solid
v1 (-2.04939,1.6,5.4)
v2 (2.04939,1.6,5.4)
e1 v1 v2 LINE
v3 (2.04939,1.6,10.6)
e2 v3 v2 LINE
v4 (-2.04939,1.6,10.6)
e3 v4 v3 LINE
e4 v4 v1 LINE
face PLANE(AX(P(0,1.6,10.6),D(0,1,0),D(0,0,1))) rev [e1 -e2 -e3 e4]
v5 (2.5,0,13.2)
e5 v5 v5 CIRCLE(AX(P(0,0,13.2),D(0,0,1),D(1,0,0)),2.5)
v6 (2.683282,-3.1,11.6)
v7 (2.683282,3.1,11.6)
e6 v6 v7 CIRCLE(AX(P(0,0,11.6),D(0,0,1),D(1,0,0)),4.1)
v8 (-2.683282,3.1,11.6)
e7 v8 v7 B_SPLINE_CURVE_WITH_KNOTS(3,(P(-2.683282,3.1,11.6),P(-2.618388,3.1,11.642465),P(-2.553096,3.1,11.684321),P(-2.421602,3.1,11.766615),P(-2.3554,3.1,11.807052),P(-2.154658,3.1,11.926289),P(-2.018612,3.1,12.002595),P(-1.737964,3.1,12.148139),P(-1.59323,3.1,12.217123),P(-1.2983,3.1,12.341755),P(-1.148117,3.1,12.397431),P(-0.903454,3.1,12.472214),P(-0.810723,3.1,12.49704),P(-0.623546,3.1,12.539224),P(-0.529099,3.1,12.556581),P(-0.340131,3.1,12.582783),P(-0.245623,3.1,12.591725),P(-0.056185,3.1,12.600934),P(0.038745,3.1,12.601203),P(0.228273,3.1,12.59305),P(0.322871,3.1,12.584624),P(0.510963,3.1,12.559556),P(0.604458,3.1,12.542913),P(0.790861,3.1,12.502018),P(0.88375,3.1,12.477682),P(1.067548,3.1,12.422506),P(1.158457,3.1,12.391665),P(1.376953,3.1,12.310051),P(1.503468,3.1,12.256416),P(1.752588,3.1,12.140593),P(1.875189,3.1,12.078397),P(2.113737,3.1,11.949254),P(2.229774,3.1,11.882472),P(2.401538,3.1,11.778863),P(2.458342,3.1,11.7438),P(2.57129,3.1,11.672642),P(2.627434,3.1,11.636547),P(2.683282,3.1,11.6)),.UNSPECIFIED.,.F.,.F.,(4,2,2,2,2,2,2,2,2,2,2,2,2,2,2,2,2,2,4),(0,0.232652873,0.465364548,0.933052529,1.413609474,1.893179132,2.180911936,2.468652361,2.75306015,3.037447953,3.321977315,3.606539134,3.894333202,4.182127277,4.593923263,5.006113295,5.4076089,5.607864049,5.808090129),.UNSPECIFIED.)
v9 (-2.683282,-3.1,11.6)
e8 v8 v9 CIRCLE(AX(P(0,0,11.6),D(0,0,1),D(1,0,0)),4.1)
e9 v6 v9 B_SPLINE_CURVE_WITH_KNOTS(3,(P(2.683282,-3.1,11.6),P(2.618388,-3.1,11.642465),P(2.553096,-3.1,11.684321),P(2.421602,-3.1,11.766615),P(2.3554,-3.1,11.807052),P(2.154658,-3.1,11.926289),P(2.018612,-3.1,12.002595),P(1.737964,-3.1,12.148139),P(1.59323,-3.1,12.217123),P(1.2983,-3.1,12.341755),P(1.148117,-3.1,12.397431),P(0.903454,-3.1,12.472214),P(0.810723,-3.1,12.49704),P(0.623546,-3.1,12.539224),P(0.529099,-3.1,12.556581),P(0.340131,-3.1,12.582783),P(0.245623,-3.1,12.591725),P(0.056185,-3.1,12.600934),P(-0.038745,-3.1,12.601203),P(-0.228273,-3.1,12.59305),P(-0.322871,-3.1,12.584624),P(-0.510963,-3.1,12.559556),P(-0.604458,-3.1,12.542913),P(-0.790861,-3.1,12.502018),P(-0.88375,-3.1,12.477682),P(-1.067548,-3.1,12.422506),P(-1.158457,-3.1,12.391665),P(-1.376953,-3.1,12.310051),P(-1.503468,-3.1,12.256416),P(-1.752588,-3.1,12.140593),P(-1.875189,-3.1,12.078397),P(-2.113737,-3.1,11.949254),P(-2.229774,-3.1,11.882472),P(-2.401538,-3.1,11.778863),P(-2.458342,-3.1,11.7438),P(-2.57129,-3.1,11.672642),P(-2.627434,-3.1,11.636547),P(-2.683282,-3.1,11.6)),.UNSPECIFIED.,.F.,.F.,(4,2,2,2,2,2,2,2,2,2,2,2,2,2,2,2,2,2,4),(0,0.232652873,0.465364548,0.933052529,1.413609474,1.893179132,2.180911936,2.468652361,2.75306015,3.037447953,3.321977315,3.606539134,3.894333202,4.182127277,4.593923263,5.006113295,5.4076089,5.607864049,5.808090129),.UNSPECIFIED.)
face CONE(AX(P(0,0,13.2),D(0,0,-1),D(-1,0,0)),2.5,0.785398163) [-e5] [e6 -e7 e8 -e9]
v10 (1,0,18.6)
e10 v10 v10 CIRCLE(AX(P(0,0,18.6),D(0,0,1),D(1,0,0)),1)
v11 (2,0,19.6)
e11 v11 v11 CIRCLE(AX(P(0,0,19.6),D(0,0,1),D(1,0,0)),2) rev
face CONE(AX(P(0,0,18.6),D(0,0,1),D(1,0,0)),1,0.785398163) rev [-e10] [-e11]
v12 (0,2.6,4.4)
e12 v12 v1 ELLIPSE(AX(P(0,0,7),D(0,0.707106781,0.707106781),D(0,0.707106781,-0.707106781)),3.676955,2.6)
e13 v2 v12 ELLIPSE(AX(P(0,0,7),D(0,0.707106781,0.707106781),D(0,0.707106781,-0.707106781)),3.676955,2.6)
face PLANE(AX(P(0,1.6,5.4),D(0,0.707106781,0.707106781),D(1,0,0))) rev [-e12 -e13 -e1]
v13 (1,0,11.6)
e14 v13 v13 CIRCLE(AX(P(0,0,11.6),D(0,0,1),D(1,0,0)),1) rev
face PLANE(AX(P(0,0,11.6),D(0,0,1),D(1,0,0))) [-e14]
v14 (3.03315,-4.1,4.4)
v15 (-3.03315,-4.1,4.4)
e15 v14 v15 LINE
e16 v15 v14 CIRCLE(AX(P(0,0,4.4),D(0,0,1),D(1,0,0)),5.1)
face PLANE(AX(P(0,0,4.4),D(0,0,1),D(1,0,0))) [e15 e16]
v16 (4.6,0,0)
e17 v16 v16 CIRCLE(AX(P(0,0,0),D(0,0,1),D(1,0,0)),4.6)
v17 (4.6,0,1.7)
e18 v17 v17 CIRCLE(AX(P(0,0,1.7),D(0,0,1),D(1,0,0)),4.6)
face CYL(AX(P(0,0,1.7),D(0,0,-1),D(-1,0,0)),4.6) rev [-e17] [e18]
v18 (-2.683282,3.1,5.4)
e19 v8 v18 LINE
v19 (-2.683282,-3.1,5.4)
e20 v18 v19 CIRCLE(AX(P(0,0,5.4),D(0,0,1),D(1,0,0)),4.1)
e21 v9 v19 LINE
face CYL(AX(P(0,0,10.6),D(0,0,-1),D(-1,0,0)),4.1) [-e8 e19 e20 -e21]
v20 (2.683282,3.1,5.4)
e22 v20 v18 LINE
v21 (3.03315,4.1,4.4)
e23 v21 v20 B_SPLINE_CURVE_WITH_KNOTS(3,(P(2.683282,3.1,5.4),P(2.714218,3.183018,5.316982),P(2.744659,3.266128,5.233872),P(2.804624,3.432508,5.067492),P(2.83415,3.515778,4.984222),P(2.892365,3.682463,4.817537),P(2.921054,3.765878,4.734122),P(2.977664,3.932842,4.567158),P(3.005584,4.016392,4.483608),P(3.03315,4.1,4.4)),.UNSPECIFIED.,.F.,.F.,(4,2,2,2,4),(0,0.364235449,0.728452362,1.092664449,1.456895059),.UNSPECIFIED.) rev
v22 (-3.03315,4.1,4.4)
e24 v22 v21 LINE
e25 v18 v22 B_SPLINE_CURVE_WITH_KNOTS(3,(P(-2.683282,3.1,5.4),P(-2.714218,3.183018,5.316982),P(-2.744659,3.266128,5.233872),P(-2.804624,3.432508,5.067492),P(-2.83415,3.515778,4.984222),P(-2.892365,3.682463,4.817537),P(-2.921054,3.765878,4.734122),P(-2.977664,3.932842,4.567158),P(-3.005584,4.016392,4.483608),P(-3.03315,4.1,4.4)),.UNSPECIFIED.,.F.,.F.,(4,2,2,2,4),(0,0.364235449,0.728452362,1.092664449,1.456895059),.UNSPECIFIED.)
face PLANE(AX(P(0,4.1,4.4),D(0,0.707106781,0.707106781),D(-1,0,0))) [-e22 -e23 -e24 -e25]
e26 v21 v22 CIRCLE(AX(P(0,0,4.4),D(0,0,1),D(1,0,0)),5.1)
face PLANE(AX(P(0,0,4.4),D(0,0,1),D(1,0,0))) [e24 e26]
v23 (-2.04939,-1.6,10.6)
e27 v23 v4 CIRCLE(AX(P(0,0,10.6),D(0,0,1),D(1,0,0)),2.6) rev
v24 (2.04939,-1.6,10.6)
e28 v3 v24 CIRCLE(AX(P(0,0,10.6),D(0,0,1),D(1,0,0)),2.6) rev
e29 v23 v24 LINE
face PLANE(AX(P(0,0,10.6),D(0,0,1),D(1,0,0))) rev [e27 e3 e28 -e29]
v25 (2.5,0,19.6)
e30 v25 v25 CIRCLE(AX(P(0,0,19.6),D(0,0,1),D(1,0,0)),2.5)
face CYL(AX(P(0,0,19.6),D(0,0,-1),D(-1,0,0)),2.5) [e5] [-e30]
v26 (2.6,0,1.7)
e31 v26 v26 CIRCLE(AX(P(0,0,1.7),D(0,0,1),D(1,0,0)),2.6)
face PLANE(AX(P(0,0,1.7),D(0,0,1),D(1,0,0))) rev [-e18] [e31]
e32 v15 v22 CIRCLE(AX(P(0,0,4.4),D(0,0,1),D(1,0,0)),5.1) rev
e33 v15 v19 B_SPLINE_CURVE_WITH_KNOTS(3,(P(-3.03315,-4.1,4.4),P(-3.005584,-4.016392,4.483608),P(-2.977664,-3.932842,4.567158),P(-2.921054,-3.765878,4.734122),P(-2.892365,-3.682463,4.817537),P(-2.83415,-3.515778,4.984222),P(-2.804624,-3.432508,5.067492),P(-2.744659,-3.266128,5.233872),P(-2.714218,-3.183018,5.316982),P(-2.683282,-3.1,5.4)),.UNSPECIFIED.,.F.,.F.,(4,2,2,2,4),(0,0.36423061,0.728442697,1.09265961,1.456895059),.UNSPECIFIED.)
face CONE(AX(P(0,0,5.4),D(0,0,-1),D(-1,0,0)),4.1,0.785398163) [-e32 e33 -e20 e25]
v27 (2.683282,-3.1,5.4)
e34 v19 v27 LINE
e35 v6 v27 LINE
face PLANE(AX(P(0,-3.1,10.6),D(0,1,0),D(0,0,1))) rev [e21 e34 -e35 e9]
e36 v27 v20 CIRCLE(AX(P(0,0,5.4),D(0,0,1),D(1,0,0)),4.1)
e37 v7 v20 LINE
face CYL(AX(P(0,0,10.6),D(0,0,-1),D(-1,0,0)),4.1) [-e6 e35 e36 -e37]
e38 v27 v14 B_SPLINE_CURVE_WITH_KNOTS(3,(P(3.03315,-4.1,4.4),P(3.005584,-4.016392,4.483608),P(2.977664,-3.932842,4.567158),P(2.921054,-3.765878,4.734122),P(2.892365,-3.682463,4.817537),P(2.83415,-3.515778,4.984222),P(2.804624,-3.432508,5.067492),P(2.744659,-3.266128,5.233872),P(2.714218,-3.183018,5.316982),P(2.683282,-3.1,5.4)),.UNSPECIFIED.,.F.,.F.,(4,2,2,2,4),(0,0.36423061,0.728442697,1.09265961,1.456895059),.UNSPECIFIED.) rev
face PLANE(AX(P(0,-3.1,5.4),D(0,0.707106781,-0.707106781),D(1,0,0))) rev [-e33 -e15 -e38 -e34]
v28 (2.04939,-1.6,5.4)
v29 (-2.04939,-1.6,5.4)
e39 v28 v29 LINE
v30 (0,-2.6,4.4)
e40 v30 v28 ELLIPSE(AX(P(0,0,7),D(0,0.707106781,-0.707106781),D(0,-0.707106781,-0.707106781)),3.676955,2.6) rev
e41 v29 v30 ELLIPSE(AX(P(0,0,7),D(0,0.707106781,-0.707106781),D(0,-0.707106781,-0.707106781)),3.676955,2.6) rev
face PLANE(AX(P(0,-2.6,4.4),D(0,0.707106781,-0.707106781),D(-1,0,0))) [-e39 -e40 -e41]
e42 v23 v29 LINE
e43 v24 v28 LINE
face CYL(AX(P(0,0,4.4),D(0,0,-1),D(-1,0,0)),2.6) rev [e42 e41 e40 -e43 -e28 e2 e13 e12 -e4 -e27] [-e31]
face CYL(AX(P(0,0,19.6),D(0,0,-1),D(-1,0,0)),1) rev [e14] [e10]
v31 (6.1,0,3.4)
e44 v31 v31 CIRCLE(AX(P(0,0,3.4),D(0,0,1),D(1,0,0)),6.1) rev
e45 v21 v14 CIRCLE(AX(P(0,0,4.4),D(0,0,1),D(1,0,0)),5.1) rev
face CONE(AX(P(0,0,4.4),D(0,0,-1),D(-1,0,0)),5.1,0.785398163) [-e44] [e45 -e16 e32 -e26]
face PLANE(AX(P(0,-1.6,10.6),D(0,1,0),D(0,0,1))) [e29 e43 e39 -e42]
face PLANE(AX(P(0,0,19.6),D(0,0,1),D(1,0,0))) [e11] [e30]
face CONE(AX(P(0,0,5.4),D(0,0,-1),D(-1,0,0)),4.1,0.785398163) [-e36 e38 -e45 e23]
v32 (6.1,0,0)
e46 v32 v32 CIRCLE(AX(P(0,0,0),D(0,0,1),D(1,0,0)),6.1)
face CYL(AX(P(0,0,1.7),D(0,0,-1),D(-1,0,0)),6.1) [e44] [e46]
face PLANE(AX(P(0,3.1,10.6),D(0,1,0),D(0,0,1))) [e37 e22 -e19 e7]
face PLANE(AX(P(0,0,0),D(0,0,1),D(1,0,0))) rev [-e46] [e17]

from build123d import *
from build123d.topology import SkipClean

# Parameters (mm, degrees)
ESQUISSE1_R        = 6.1
ESQUISSE1_R_2      = 4.6
BOSS_EXTRU_1_DEPTH = 1.7
ESQUISSE2_R        = 6.1
ESQUISSE2_R_2      = 2.6
BOSS_EXTRU_2_DEPTH = 2.7
BOSS_EXTRU_3_DEPTH = 6.2
BOSS_EXTRU_4_DEPTH = 1
CHANFREIN1_SIZE    = 1
CHANFREIN2_SIZE    = 1
ESQUISSE5_R        = 2.5
ESQUISSE5_R_2      = 1
BOSS_EXTRU_5_DEPTH = 8
CHANFREIN3_SIZE    = 1
CHANFREIN4_SIZE    = 1.6


# Some blends are built 0.0001 mm under size
with BuildPart() as part:
    # Esquisse1 → Boss.-Extru.1 (new body)
    with BuildSketch(Plane.XY):
        Circle(ESQUISSE1_R)
        Circle(ESQUISSE1_R_2, mode=Mode.SUBTRACT)
    extrude(amount=BOSS_EXTRU_1_DEPTH)

    # Esquisse2 → Boss.-Extru.2 (add)
    with BuildSketch(Plane.XY.offset(1.7)):
        Circle(ESQUISSE2_R)
        with Locations(Location((0, 0, 0), (0, 0, 180))):
            Circle(ESQUISSE2_R_2, mode=Mode.SUBTRACT)
    extrude(amount=BOSS_EXTRU_2_DEPTH)

    # Esquisse3 → Boss.-Extru.3 (add)
    with SkipClean():  # the faces are left unmerged after this step: merging them gives an invalid solid
        with BuildSketch(Plane.XY.offset(4.4)):
            with BuildLine():
                Line((2.683282, 3.1), (-2.683282, 3.1))
                ThreePointArc((-2.683282, 3.1), (-4.1, 0), (-2.683282, -3.1))
                Line((-2.683282, -3.1), (2.683282, -3.1))
                ThreePointArc((2.683282, -3.1), (4.1, 0), (2.683282, 3.1))
            make_face()
            with BuildLine():
                Line((2.04939, -1.6), (-2.04939, -1.6))
                ThreePointArc((-2.04939, -1.6), (-2.6, 0), (-2.04939, 1.6))
                Line((-2.04939, 1.6), (2.04939, 1.6))
                ThreePointArc((2.04939, 1.6), (2.6, 0), (2.04939, -1.6))
            make_face(mode=Mode.SUBTRACT)
        extrude(amount=BOSS_EXTRU_3_DEPTH)

    # Esquisse4 → Boss.-Extru.4 (add)
    with SkipClean():  # the faces are left unmerged after this step: merging them gives an invalid solid
        with BuildSketch(Plane.XY.offset(10.6)):
            with BuildLine():
                Line((2.683282, 3.1), (-2.683282, 3.1))
                ThreePointArc((-2.683282, 3.1), (-4.1, 0), (-2.683282, -3.1))
                Line((-2.683282, -3.1), (2.683282, -3.1))
                ThreePointArc((2.683282, -3.1), (4.1, 0), (2.683282, 3.1))
            make_face()
        extrude(amount=BOSS_EXTRU_4_DEPTH)

    # Chanfrein1
    chanfrein1_edges = [part.edges().sort_by_distance(p)[0] for p in [
        (0, 3.1, 4.4),
        (-4.1, 0, 4.4),
        (0, -3.1, 4.4),
        (4.1, 0, 4.4),
        (-6.1, 0, 4.4),
    ]]
    chamfer(chanfrein1_edges, length=CHANFREIN1_SIZE - 0.0001)  # a hair under: the kernel refuses the full size

    # Chanfrein2
    # the kernel refuses this chamfer: 1 mm, written as the material it takes off along each edge
    with BuildSketch(Plane(origin=(4.621073, -1.6, 4.4), x_dir=(0, -0.9996219169112968, -0.027495876610586487), z_dir=(-1, 0, 0))) as chanfrein2_piece_1_section:
        Polygon((CHANFREIN2_SIZE * 0.999621916911, CHANFREIN2_SIZE * 0.0274958766106), (-CHANFREIN2_SIZE * 0.0274958766106, CHANFREIN2_SIZE * 0.999621916911), (0, 0), align=None)
    chanfrein2_piece_1 = extrude(amount=9.242146, mode=Mode.PRIVATE)
    chanfrein2_piece_1 = chanfrein2_piece_1 & Plane(origin=(0, 0, 4.756384), x_dir=(-1, 0, 0), z_dir=(0, 0, -1)) * Cylinder(2.6, 23, mode=Mode.PRIVATE)
    add(chanfrein2_piece_1, mode=Mode.SUBTRACT)
    with BuildSketch(Plane(origin=(-4.621073, 1.6, 4.4), x_dir=(0, 0.9996219169112968, -0.027495876610586487), z_dir=(1, 0, 0))) as chanfrein2_piece_2_section:
        Polygon((CHANFREIN2_SIZE * 0.999621916911, CHANFREIN2_SIZE * 0.0274958766106), (-CHANFREIN2_SIZE * 0.0274958766106, CHANFREIN2_SIZE * 0.999621916911), (0, 0), align=None)
    chanfrein2_piece_2 = extrude(amount=9.242146, mode=Mode.PRIVATE)
    chanfrein2_piece_2 = chanfrein2_piece_2 & Plane(origin=(0, 0, 4.756384), x_dir=(-1, 0, 0), z_dir=(0, 0, -1)) * Cylinder(2.6, 23, mode=Mode.PRIVATE)
    add(chanfrein2_piece_2, mode=Mode.SUBTRACT)

    # Esquisse5 → Boss.-Extru.5 (add)
    with BuildSketch(Plane.XY.offset(11.6)):
        Circle(ESQUISSE5_R)
        Circle(ESQUISSE5_R_2, mode=Mode.SUBTRACT)
    extrude(amount=BOSS_EXTRU_5_DEPTH)

    # Chanfrein3
    chanfrein3_edges = [part.edges().sort_by_distance(p)[0] for p in [
        (-1, 0, 19.6),
    ]]
    chamfer(chanfrein3_edges, length=CHANFREIN3_SIZE)

    # Chanfrein4
    # the kernel refuses this chamfer: 1.6 mm, written as the material it adds along each edge
    with BuildSketch(Plane(origin=(0, 0, 11.6), x_dir=(1, 0, 0), z_dir=(0, -1, 0))) as chanfrein4_piece_1_section:
        Polygon((2.5, CHANFREIN4_SIZE), (2.5 + CHANFREIN4_SIZE, 0), (2.5, 0), align=None)
    chanfrein4_piece_1 = revolve(axis=Axis((0, 0, 11.6), (0, 0, 1)), mode=Mode.PRIVATE)
    chanfrein4_piece_1 = split(chanfrein4_piece_1, bisect_by=Plane(origin=(-3.280327, 3.1, 12.380327), z_dir=(0, -1, 0)), keep=Keep.TOP, mode=Mode.PRIVATE)
    chanfrein4_piece_1 = split(chanfrein4_piece_1, bisect_by=Plane(origin=(-3.280327, -3.1, 12.380327), z_dir=(0, 1, 0)), keep=Keep.TOP, mode=Mode.PRIVATE)
    add(chanfrein4_piece_1)


solid = part.part
